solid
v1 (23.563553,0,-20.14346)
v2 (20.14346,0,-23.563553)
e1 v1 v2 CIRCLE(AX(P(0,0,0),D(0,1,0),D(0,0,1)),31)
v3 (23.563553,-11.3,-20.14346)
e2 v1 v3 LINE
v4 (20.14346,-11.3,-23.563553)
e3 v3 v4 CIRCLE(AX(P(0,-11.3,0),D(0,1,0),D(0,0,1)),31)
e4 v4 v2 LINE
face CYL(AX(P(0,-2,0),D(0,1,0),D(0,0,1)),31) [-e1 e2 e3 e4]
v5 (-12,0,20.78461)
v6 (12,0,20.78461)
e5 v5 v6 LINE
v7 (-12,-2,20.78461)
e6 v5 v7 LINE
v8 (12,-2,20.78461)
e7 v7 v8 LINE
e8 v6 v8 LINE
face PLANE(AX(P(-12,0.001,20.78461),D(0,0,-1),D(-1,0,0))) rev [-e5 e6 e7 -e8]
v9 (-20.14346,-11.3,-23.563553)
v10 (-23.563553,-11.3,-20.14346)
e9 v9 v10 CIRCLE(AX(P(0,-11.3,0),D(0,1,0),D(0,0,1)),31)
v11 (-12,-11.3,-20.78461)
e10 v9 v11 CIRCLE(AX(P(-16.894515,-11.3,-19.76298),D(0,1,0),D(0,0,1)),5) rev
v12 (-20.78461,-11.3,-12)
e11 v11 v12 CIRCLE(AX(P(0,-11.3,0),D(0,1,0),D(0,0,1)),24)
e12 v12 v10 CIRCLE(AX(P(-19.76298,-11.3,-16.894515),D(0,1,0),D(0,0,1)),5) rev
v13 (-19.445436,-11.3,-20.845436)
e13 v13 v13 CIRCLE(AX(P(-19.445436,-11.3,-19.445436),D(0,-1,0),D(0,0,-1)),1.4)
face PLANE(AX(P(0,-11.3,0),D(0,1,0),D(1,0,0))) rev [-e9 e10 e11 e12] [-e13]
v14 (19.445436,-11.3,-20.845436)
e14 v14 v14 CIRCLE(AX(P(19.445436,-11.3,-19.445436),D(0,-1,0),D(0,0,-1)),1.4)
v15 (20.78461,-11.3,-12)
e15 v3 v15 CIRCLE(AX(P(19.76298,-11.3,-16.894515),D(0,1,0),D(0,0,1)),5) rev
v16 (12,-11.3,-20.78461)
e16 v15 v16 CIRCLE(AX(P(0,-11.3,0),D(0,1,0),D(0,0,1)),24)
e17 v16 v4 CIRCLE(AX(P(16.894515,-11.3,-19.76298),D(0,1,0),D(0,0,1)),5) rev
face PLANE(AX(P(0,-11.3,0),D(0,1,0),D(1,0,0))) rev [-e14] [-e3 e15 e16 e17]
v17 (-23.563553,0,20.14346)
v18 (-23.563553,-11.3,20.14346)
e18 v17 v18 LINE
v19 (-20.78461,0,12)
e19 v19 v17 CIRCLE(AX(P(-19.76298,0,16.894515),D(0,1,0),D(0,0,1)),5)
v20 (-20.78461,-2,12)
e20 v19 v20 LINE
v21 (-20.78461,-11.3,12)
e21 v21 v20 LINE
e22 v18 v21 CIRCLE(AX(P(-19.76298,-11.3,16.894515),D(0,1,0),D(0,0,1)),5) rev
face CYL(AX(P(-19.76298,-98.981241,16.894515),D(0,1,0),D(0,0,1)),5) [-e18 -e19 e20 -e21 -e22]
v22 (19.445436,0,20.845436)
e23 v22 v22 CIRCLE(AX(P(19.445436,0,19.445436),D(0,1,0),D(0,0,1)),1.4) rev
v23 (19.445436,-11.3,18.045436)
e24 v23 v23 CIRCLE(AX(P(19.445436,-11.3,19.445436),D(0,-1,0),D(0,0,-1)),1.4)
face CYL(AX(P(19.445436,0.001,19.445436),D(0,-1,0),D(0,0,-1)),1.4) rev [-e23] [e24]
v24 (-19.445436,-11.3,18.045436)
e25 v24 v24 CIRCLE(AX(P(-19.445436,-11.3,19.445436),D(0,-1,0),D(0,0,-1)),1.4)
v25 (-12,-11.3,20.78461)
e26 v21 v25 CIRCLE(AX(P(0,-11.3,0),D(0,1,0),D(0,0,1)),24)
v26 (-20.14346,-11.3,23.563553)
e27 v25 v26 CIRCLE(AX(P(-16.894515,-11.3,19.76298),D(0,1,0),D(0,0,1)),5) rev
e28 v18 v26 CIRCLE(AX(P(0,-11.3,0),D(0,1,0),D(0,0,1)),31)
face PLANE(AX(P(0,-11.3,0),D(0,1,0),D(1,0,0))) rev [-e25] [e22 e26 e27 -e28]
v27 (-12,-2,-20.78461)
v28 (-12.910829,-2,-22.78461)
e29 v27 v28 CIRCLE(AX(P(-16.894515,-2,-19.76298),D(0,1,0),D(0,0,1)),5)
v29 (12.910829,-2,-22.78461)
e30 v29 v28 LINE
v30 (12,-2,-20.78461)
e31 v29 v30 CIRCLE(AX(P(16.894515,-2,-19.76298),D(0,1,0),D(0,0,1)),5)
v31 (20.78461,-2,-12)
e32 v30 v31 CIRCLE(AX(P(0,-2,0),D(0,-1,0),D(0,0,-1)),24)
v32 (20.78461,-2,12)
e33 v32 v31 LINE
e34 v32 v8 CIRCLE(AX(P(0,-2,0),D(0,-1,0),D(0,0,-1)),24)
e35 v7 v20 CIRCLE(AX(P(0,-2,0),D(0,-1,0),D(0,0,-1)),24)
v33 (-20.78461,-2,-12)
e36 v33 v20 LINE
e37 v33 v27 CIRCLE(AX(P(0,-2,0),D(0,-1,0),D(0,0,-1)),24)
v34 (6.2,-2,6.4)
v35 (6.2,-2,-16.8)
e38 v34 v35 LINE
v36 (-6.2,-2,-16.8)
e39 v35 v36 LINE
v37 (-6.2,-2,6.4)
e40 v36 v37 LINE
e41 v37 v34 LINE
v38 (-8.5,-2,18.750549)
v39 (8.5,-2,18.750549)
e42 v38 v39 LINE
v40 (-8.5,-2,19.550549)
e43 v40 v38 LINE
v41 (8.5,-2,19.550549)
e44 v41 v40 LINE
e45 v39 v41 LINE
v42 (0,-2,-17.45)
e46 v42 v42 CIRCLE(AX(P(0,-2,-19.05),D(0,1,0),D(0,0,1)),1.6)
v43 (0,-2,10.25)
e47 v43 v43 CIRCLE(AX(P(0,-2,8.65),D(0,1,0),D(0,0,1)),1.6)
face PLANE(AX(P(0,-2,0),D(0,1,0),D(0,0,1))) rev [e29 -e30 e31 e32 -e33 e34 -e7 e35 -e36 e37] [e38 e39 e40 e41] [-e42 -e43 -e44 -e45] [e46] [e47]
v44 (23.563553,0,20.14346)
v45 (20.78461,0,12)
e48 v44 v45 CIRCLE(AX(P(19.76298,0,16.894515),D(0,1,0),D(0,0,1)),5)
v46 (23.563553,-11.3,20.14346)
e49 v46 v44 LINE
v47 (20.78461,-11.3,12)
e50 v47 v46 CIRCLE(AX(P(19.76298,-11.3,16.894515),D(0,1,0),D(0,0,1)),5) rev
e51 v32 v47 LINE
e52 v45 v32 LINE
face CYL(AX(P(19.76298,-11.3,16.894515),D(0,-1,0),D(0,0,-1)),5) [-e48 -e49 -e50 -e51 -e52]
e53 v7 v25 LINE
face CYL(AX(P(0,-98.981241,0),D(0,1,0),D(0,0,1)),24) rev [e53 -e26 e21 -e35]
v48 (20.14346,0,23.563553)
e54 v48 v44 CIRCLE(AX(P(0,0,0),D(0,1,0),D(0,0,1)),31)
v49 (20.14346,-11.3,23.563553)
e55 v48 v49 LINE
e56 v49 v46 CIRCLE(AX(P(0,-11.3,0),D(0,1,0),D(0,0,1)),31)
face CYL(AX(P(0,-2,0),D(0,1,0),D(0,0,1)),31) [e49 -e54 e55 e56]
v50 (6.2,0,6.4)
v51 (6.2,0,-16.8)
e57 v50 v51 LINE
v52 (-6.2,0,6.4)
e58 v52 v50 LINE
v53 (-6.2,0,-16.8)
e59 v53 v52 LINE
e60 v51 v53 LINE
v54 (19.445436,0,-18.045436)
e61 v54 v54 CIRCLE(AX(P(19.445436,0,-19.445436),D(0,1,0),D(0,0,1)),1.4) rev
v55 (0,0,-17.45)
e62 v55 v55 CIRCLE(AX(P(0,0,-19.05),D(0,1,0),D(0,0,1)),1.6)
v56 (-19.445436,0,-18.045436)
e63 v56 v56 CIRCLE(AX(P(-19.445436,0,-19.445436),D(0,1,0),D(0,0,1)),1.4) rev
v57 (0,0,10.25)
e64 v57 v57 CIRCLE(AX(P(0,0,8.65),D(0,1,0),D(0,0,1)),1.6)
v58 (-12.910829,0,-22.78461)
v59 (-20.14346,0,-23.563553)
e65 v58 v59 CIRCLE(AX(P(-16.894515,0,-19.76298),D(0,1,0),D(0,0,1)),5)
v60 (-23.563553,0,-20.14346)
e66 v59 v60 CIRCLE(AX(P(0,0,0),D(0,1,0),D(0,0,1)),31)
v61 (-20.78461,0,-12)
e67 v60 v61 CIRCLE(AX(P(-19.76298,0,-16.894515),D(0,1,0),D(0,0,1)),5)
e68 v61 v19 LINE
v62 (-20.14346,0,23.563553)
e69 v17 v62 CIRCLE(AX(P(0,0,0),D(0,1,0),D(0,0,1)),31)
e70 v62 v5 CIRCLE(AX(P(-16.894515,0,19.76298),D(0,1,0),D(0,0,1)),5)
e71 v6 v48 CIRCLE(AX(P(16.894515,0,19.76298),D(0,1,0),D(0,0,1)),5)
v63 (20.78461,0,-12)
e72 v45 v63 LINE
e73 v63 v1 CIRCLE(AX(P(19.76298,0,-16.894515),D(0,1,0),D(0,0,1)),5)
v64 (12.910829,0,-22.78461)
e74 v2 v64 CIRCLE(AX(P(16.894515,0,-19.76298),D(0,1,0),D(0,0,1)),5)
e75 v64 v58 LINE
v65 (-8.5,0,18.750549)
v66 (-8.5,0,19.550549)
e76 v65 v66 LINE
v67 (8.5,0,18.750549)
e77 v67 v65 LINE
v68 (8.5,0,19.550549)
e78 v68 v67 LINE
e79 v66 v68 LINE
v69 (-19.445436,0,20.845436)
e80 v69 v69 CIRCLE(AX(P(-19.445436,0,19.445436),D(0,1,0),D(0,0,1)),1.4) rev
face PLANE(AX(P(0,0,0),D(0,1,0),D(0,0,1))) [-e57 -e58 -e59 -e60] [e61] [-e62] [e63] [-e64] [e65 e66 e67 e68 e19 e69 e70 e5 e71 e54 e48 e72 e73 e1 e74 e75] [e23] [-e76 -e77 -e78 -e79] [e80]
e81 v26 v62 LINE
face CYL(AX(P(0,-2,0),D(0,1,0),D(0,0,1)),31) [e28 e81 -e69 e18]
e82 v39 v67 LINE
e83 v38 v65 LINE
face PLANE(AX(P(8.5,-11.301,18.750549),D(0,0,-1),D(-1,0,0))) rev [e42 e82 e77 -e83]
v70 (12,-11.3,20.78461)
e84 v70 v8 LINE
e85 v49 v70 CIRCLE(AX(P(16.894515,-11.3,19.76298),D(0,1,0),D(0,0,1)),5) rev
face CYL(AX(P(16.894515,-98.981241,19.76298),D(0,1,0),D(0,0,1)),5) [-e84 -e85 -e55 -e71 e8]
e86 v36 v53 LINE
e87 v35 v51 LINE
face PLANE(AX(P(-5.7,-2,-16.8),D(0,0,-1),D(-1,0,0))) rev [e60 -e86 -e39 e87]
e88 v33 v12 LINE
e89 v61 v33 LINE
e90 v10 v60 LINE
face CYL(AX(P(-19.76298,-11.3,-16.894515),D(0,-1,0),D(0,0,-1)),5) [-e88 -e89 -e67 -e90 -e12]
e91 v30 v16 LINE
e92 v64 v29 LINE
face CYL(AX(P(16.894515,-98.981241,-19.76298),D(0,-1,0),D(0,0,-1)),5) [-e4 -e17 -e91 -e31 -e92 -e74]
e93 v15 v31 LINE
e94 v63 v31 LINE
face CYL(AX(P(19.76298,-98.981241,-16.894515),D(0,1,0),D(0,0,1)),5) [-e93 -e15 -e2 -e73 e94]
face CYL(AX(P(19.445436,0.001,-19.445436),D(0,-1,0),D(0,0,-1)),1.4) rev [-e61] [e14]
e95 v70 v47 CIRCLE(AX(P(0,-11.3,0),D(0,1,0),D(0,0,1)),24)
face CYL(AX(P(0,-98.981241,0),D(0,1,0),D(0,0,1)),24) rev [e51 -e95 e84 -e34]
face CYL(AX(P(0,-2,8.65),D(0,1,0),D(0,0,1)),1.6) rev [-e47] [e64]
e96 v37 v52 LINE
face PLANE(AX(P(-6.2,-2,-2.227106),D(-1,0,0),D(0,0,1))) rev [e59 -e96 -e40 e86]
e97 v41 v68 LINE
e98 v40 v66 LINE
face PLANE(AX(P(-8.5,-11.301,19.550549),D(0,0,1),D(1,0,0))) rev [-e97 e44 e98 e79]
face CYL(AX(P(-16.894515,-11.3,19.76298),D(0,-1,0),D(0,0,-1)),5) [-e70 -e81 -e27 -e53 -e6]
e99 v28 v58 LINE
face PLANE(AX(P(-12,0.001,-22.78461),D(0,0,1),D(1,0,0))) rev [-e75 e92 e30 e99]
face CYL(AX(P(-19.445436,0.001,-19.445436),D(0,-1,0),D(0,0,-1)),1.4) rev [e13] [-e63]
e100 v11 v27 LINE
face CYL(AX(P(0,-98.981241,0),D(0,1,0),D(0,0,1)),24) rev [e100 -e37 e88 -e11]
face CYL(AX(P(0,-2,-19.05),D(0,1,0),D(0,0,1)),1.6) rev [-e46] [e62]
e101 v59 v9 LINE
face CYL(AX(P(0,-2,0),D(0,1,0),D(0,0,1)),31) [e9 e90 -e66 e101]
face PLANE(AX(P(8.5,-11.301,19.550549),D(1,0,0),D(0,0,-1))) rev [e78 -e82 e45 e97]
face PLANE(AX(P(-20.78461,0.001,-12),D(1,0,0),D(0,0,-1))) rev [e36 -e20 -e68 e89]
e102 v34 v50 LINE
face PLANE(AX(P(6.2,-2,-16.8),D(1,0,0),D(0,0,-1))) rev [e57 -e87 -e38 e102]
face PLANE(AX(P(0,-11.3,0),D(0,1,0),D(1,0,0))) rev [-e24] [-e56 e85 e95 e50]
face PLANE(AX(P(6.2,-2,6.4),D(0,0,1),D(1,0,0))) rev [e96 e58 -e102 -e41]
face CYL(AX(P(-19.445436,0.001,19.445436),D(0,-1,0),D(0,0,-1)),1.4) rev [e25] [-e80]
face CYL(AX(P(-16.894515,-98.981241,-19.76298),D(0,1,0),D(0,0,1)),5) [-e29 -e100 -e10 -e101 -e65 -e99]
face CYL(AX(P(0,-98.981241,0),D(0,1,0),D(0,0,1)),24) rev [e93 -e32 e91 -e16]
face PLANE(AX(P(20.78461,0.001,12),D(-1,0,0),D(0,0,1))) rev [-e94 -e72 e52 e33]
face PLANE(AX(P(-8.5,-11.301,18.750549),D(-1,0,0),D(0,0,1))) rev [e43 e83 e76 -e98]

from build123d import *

# Parameters (mm, degrees)
SKETCH3_R            = 31
SKETCH3_R_2          = 1.6
SERVO_MOUNT_DEPTH    = 2
SKETCH4_R            = 31
SKETCH4_R_2          = 24
SPACER_DEPTH         = 9.3
FLEX_CABLE_REACH     = 47.274
SKETCH5_W            = 17
SKETCH5_H            = 0.8
SKETCH7_W            = 24
SKETCH7_H            = 62
CUT_EXTRUDE3_DEPTH   = 45.816180114
SKETCH8_W            = 62
SKETCH8_H            = 24
CUT_EXTRUDE4_DEPTH   = 45.816180114
MOUNTING_HOLES_REACH = 47.274
SKETCH10_R           = 1.4
CUT_EXTRUDE5_REACH   = 46.816
FILLET2_R            = 5


with BuildPart() as part:
    # Sketch3 → Servo mount (new body)
    with BuildSketch(Plane(origin=(0, 0, 0), x_dir=(1, 0, 0), z_dir=(0, 1, 0))):
        with Locations(Location((0, 0, 0), (0, 0, 270))):
            Circle(SKETCH3_R)
        with Locations(Location((0, -8.65, 0), (0, 0, 270))):
            Circle(SKETCH3_R_2, mode=Mode.SUBTRACT)
        with Locations(Location((0, 19.05, 0), (0, 0, 270))):
            Circle(SKETCH3_R_2, mode=Mode.SUBTRACT)
        Polygon((-6.2, 16.1), (-6.2, 2.227105745), (-6.2, -6.4), (-5.7, -6.4), (5.7, -6.4), (6.2, -6.4), (6.2, 2.227105745), (6.2, 16.1), (6.2, 16.8), (5.7, 16.8), (-5.7, 16.8), (-6.2, 16.8), align=None, mode=Mode.SUBTRACT)
    extrude(amount=-SERVO_MOUNT_DEPTH)

    # Sketch4 → Spacer (add)
    with BuildSketch(Plane(origin=(0, -2, 0), x_dir=(-1, 0, 0), z_dir=(0, -1, 0))):
        with Locations(Location((0, 0, 0), (0, 0, 270))):
            Circle(SKETCH4_R)
        with Locations(Location((0, 0, 0), (0, 0, 270))):
            Circle(SKETCH4_R_2, mode=Mode.SUBTRACT)
    extrude(amount=SPACER_DEPTH)

    # Sketch5 → Flex cable (cut, up to next)
    with BuildSketch(Plane(origin=(0, 0, 0), x_dir=(1, 0, 0), z_dir=(0, 1, 0)), mode=Mode.PRIVATE) as flex_cable_sk1:
        with Locations((0, -19.15054858)):
            Rectangle(SKETCH5_W, SKETCH5_H)
    flex_cable_tool1 = extrude(flex_cable_sk1.sketch, amount=-FLEX_CABLE_REACH, mode=Mode.PRIVATE) & part.part
    add(flex_cable_tool1.solids().sort_by_distance((0, 0, 19.150549))[0], mode=Mode.SUBTRACT)

    # Sketch7 → Cut-Extrude3 (cut, through all)
    with BuildSketch(Plane.XZ.offset(2)):
        Rectangle(SKETCH7_W, SKETCH7_H)
    extrude(amount=CUT_EXTRUDE3_DEPTH, mode=Mode.SUBTRACT)

    # Sketch8 → Cut-Extrude4 (cut, through all)
    with BuildSketch(Plane.XZ.offset(2)):
        Rectangle(SKETCH8_W, SKETCH8_H)
    extrude(amount=CUT_EXTRUDE4_DEPTH, mode=Mode.SUBTRACT)

    # Sketch10 → Mounting holes (cut, up to next)
    with BuildSketch(Plane.XZ.offset(11.3), mode=Mode.PRIVATE) as mounting_holes_sk1:
        with Locations(Location((-19.445436483, -19.445436483, 0), (0, 0, 270))):
            Circle(SKETCH10_R)
    mounting_holes_tool1 = extrude(mounting_holes_sk1.sketch, amount=-MOUNTING_HOLES_REACH, mode=Mode.PRIVATE) & part.part
    # Sketch10 → Mounting holes (cut, up to next)
    with BuildSketch(Plane.XZ.offset(11.3), mode=Mode.PRIVATE) as mounting_holes_sk2:
        with Locations(Location((19.445436483, -19.445436483, 0), (0, 0, 270))):
            Circle(SKETCH10_R)
    mounting_holes_tool2 = extrude(mounting_holes_sk2.sketch, amount=-MOUNTING_HOLES_REACH, mode=Mode.PRIVATE) & part.part
    # Sketch10 → Mounting holes (cut, up to next)
    with BuildSketch(Plane.XZ.offset(11.3), mode=Mode.PRIVATE) as mounting_holes_sk3:
        with Locations(Location((-19.445436483, 19.445436483, 0), (0, 0, 270))):
            Circle(SKETCH10_R)
    mounting_holes_tool3 = extrude(mounting_holes_sk3.sketch, amount=-MOUNTING_HOLES_REACH, mode=Mode.PRIVATE) & part.part
    # Sketch10 → Mounting holes (cut, up to next)
    with BuildSketch(Plane.XZ.offset(11.3), mode=Mode.PRIVATE) as mounting_holes_sk4:
        with Locations(Location((19.445436483, 19.445436483, 0), (0, 0, 270))):
            Circle(SKETCH10_R)
    mounting_holes_tool4 = extrude(mounting_holes_sk4.sketch, amount=-MOUNTING_HOLES_REACH, mode=Mode.PRIVATE) & part.part
    add(mounting_holes_tool1.solids().sort_by_distance((-19.445436, -11.3, -19.445436))[0], mode=Mode.SUBTRACT)
    add(mounting_holes_tool2.solids().sort_by_distance((19.445436, -11.3, -19.445436))[0], mode=Mode.SUBTRACT)
    add(mounting_holes_tool3.solids().sort_by_distance((-19.445436, -11.3, 19.445436))[0], mode=Mode.SUBTRACT)
    add(mounting_holes_tool4.solids().sort_by_distance((19.445436, -11.3, 19.445436))[0], mode=Mode.SUBTRACT)

    # Sketch11 → Cut-Extrude5 (cut, up to next)
    with BuildSketch(Plane.XZ.offset(2), mode=Mode.PRIVATE) as cut_extrude5_sk1:
        with BuildLine():
            Line((-12, -22.784609691), (12, -22.784609691))
            Line((12, -22.784609691), (12, -28.583211856))
            ThreePointArc((12, -28.583211856), (0, -31), (-12, -28.583211856))
            Line((-12, -28.583211856), (-12, -22.784609691))
        make_face()
    cut_extrude5_tool1 = extrude(cut_extrude5_sk1.sketch, amount=-CUT_EXTRUDE5_REACH, mode=Mode.PRIVATE) & part.part
    # Sketch11 → Cut-Extrude5 (cut, up to next)
    with BuildSketch(Plane.XZ.offset(2), mode=Mode.PRIVATE) as cut_extrude5_sk2:
        with BuildLine():
            Line((28.583211856, 12), (20.784609691, 12))
            Line((20.784609691, 12), (20.784609691, -12))
            Line((20.784609691, -12), (28.583211856, -12))
            ThreePointArc((28.583211856, -12), (31, 0), (28.583211856, 12))
        make_face()
    cut_extrude5_tool2 = extrude(cut_extrude5_sk2.sketch, amount=-CUT_EXTRUDE5_REACH, mode=Mode.PRIVATE) & part.part
    # Sketch11 → Cut-Extrude5 (cut, up to next)
    with BuildSketch(Plane.XZ.offset(2), mode=Mode.PRIVATE) as cut_extrude5_sk3:
        with BuildLine():
            Line((-28.583211856, -12), (-20.784609691, -12))
            Line((-20.784609691, -12), (-20.784609691, 12))
            Line((-20.784609691, 12), (-28.583211856, 12))
            ThreePointArc((-28.583211856, 12), (-31, 0), (-28.583211856, -12))
        make_face()
    cut_extrude5_tool3 = extrude(cut_extrude5_sk3.sketch, amount=-CUT_EXTRUDE5_REACH, mode=Mode.PRIVATE) & part.part
    # Sketch11 → Cut-Extrude5 (cut, up to next)
    with BuildSketch(Plane.XZ.offset(2), mode=Mode.PRIVATE) as cut_extrude5_sk4:
        with BuildLine():
            Line((12, 20.784609691), (12, 28.583211856))
            ThreePointArc((12, 28.583211856), (0, 31), (-12, 28.583211856))
            Line((-12, 28.583211856), (-12, 20.784609691))
            Line((-12, 20.784609691), (12, 20.784609691))
        make_face()
    cut_extrude5_tool4 = extrude(cut_extrude5_sk4.sketch, amount=-CUT_EXTRUDE5_REACH, mode=Mode.PRIVATE) & part.part
    add(cut_extrude5_tool1.solids().sort_by_distance((0, -2, -26.530561))[0], mode=Mode.SUBTRACT)
    add(cut_extrude5_tool2.solids().sort_by_distance((25.523226, -2, 0))[0], mode=Mode.SUBTRACT)
    add(cut_extrude5_tool3.solids().sort_by_distance((-25.523226, -2, 0))[0], mode=Mode.SUBTRACT)
    add(cut_extrude5_tool4.solids().sort_by_distance((0, -2, 25.523226))[0], mode=Mode.SUBTRACT)

    # Fillet2
    # the kernel refuses this fillet: 5 mm, written as the material it takes off along each edge
    with BuildSketch(Plane(origin=(12, -35.215595033, 28.583211856), x_dir=(0.8512708603213988, -2.9625112876132807e-14, -0.5247265215020731), z_dir=(0, 1, 0))) as fillet2_piece_1:
        with BuildLine():
            CenterArc((8.794767206, 4.940124775), FILLET2_R, 160.140208495, 118.735653745)
            Line((4.092133387, 6.638722774), (0, 0))
            ThreePointArc((0, 0), (4.783119007, -0.371226395), (9.566238013, 0))
        make_face()
    extrude(amount=59.131190067, mode=Mode.SUBTRACT)
    with BuildSketch(Plane(origin=(12, 23.915595033, -28.583211856), x_dir=(0, 0, 1), z_dir=(0, -1, 0))) as fillet2_piece_2_section:
        with BuildLine():
            CenterArc((8.820231871, -4.894514557), FILLET2_R, 101.790043136, 118.735653745)
            ThreePointArc((5.019658797, -8.143459664), (2.193815186, -4.266522167), (0, 0))
            Line((0, 0), (7.798602165, 0))
        make_face()
    fillet2_piece_2 = extrude(amount=59.131190067, mode=Mode.PRIVATE)
    fillet2_piece_2 = split(fillet2_piece_2, bisect_by=Plane(origin=(16.358047436, -1, -22.784609691), z_dir=(0, 0, -1)), keep=Keep.TOP, mode=Mode.PRIVATE)
    add(fillet2_piece_2, mode=Mode.SUBTRACT)
    with BuildSketch(Plane(origin=(12, 23.915595033, -28.583211856), x_dir=(0, 0, 1), z_dir=(0, -1, 0))) as fillet2_piece_3_section:
        with BuildLine():
            CenterArc((8.820231871, -4.894514557), FILLET2_R, 101.790043136, 118.735653745)
            ThreePointArc((5.019658797, -8.143459664), (2.193815186, -4.266522167), (0, 0))
            Line((0, 0), (7.798602165, 0))
        make_face()
    fillet2_piece_3 = extrude(amount=59.131190067, mode=Mode.PRIVATE)
    fillet2_piece_3 = split(fillet2_piece_3, bisect_by=Plane(origin=(12.335072, -2, -21.839415291), z_dir=(0, -1, 0)), keep=Keep.TOP, mode=Mode.PRIVATE)
    add(fillet2_piece_3, mode=Mode.SUBTRACT)
    with BuildSketch(Plane(origin=(28.583211856, 23.915595033, -12), x_dir=(-1, 0, 0), z_dir=(0, -1, 0))) as fillet2_piece_4:
        with BuildLine():
            CenterArc((8.820231871, 4.894514557), FILLET2_R, 139.474303119, 118.735653745)
            ThreePointArc((5.019658797, 8.143459664), (2.193815186, 4.266522167), (0, 0))
            Line((0, 0), (7.798602165, 0))
        make_face()
    extrude(amount=59.131190067, mode=Mode.SUBTRACT)
    with BuildSketch(Plane(origin=(-28.583211856, 23.915595033, -12), x_dir=(1, 0, 0), z_dir=(0, -1, 0)), Plane(origin=(28.583211856, 23.915595033, 12), x_dir=(-1, 0, 0), z_dir=(0, -1, 0))) as fillet2_piece_5:
        with BuildLine():
            CenterArc((8.820231871, -4.894514557), FILLET2_R, 101.790043136, 118.735653745)
            ThreePointArc((5.019658797, -8.143459664), (2.193815186, -4.266522167), (0, 0))
            Line((0, 0), (7.798602165, 0))
        make_face()
    extrude(amount=59.131190067, mode=Mode.SUBTRACT)
    with BuildSketch(Plane(origin=(-28.583211856, 23.915595033, 12), x_dir=(0.5247265215020732, -2.488832337515826e-14, 0.8512708603213986), z_dir=(0, -1, 0)), Plane(origin=(-12, -35.215595033, 28.583211856), x_dir=(-0.8512708603213989, -3.062415803150537e-14, -0.524726521502073), z_dir=(0, 1, 0))) as fillet2_piece_6:
        with BuildLine():
            CenterArc((8.794767206, -4.940124775), FILLET2_R, 81.12413776, 118.735653745)
            Line((4.092133387, -6.638722774), (0, 0))
            ThreePointArc((0, 0), (4.783119007, 0.371226395), (9.566238013, 0))
        make_face()
    extrude(amount=59.131190067, mode=Mode.SUBTRACT)
    with BuildSketch(Plane(origin=(-12, 23.915595033, -28.583211856), x_dir=(-0.8512708603213988, 1.214076701840839e-14, 0.5247265215020731), z_dir=(0, -1, 0))) as fillet2_piece_7_section:
        with BuildLine():
            CenterArc((8.794767206, -4.940124775), FILLET2_R, 81.12413776, 118.735653745)
            Line((4.092133387, -6.638722774), (0, 0))
            ThreePointArc((0, 0), (4.783119007, 0.371226395), (9.566238013, 0))
        make_face()
    fillet2_piece_7 = extrude(amount=59.131190067, mode=Mode.PRIVATE)
    fillet2_piece_7 = split(fillet2_piece_7, bisect_by=Plane(origin=(-16.358047436, -1, -22.784609691), z_dir=(0, 0, -1)), keep=Keep.TOP, mode=Mode.PRIVATE)
    add(fillet2_piece_7, mode=Mode.SUBTRACT)
    with BuildSketch(Plane(origin=(-12, 23.915595033, -28.583211856), x_dir=(-0.8512708603213988, 1.214076701840839e-14, 0.5247265215020731), z_dir=(0, -1, 0))) as fillet2_piece_8_section:
        with BuildLine():
            CenterArc((8.794767206, -4.940124775), FILLET2_R, 81.12413776, 118.735653745)
            Line((4.092133387, -6.638722774), (0, 0))
            ThreePointArc((0, 0), (4.783119007, 0.371226395), (9.566238013, 0))
        make_face()
    fillet2_piece_8 = extrude(amount=59.131190067, mode=Mode.PRIVATE)
    fillet2_piece_8 = split(fillet2_piece_8, bisect_by=Plane(origin=(-12.335072, -2, -21.839415291), z_dir=(0, -1, 0)), keep=Keep.TOP, mode=Mode.PRIVATE)
    add(fillet2_piece_8, mode=Mode.SUBTRACT)


solid = part.part
